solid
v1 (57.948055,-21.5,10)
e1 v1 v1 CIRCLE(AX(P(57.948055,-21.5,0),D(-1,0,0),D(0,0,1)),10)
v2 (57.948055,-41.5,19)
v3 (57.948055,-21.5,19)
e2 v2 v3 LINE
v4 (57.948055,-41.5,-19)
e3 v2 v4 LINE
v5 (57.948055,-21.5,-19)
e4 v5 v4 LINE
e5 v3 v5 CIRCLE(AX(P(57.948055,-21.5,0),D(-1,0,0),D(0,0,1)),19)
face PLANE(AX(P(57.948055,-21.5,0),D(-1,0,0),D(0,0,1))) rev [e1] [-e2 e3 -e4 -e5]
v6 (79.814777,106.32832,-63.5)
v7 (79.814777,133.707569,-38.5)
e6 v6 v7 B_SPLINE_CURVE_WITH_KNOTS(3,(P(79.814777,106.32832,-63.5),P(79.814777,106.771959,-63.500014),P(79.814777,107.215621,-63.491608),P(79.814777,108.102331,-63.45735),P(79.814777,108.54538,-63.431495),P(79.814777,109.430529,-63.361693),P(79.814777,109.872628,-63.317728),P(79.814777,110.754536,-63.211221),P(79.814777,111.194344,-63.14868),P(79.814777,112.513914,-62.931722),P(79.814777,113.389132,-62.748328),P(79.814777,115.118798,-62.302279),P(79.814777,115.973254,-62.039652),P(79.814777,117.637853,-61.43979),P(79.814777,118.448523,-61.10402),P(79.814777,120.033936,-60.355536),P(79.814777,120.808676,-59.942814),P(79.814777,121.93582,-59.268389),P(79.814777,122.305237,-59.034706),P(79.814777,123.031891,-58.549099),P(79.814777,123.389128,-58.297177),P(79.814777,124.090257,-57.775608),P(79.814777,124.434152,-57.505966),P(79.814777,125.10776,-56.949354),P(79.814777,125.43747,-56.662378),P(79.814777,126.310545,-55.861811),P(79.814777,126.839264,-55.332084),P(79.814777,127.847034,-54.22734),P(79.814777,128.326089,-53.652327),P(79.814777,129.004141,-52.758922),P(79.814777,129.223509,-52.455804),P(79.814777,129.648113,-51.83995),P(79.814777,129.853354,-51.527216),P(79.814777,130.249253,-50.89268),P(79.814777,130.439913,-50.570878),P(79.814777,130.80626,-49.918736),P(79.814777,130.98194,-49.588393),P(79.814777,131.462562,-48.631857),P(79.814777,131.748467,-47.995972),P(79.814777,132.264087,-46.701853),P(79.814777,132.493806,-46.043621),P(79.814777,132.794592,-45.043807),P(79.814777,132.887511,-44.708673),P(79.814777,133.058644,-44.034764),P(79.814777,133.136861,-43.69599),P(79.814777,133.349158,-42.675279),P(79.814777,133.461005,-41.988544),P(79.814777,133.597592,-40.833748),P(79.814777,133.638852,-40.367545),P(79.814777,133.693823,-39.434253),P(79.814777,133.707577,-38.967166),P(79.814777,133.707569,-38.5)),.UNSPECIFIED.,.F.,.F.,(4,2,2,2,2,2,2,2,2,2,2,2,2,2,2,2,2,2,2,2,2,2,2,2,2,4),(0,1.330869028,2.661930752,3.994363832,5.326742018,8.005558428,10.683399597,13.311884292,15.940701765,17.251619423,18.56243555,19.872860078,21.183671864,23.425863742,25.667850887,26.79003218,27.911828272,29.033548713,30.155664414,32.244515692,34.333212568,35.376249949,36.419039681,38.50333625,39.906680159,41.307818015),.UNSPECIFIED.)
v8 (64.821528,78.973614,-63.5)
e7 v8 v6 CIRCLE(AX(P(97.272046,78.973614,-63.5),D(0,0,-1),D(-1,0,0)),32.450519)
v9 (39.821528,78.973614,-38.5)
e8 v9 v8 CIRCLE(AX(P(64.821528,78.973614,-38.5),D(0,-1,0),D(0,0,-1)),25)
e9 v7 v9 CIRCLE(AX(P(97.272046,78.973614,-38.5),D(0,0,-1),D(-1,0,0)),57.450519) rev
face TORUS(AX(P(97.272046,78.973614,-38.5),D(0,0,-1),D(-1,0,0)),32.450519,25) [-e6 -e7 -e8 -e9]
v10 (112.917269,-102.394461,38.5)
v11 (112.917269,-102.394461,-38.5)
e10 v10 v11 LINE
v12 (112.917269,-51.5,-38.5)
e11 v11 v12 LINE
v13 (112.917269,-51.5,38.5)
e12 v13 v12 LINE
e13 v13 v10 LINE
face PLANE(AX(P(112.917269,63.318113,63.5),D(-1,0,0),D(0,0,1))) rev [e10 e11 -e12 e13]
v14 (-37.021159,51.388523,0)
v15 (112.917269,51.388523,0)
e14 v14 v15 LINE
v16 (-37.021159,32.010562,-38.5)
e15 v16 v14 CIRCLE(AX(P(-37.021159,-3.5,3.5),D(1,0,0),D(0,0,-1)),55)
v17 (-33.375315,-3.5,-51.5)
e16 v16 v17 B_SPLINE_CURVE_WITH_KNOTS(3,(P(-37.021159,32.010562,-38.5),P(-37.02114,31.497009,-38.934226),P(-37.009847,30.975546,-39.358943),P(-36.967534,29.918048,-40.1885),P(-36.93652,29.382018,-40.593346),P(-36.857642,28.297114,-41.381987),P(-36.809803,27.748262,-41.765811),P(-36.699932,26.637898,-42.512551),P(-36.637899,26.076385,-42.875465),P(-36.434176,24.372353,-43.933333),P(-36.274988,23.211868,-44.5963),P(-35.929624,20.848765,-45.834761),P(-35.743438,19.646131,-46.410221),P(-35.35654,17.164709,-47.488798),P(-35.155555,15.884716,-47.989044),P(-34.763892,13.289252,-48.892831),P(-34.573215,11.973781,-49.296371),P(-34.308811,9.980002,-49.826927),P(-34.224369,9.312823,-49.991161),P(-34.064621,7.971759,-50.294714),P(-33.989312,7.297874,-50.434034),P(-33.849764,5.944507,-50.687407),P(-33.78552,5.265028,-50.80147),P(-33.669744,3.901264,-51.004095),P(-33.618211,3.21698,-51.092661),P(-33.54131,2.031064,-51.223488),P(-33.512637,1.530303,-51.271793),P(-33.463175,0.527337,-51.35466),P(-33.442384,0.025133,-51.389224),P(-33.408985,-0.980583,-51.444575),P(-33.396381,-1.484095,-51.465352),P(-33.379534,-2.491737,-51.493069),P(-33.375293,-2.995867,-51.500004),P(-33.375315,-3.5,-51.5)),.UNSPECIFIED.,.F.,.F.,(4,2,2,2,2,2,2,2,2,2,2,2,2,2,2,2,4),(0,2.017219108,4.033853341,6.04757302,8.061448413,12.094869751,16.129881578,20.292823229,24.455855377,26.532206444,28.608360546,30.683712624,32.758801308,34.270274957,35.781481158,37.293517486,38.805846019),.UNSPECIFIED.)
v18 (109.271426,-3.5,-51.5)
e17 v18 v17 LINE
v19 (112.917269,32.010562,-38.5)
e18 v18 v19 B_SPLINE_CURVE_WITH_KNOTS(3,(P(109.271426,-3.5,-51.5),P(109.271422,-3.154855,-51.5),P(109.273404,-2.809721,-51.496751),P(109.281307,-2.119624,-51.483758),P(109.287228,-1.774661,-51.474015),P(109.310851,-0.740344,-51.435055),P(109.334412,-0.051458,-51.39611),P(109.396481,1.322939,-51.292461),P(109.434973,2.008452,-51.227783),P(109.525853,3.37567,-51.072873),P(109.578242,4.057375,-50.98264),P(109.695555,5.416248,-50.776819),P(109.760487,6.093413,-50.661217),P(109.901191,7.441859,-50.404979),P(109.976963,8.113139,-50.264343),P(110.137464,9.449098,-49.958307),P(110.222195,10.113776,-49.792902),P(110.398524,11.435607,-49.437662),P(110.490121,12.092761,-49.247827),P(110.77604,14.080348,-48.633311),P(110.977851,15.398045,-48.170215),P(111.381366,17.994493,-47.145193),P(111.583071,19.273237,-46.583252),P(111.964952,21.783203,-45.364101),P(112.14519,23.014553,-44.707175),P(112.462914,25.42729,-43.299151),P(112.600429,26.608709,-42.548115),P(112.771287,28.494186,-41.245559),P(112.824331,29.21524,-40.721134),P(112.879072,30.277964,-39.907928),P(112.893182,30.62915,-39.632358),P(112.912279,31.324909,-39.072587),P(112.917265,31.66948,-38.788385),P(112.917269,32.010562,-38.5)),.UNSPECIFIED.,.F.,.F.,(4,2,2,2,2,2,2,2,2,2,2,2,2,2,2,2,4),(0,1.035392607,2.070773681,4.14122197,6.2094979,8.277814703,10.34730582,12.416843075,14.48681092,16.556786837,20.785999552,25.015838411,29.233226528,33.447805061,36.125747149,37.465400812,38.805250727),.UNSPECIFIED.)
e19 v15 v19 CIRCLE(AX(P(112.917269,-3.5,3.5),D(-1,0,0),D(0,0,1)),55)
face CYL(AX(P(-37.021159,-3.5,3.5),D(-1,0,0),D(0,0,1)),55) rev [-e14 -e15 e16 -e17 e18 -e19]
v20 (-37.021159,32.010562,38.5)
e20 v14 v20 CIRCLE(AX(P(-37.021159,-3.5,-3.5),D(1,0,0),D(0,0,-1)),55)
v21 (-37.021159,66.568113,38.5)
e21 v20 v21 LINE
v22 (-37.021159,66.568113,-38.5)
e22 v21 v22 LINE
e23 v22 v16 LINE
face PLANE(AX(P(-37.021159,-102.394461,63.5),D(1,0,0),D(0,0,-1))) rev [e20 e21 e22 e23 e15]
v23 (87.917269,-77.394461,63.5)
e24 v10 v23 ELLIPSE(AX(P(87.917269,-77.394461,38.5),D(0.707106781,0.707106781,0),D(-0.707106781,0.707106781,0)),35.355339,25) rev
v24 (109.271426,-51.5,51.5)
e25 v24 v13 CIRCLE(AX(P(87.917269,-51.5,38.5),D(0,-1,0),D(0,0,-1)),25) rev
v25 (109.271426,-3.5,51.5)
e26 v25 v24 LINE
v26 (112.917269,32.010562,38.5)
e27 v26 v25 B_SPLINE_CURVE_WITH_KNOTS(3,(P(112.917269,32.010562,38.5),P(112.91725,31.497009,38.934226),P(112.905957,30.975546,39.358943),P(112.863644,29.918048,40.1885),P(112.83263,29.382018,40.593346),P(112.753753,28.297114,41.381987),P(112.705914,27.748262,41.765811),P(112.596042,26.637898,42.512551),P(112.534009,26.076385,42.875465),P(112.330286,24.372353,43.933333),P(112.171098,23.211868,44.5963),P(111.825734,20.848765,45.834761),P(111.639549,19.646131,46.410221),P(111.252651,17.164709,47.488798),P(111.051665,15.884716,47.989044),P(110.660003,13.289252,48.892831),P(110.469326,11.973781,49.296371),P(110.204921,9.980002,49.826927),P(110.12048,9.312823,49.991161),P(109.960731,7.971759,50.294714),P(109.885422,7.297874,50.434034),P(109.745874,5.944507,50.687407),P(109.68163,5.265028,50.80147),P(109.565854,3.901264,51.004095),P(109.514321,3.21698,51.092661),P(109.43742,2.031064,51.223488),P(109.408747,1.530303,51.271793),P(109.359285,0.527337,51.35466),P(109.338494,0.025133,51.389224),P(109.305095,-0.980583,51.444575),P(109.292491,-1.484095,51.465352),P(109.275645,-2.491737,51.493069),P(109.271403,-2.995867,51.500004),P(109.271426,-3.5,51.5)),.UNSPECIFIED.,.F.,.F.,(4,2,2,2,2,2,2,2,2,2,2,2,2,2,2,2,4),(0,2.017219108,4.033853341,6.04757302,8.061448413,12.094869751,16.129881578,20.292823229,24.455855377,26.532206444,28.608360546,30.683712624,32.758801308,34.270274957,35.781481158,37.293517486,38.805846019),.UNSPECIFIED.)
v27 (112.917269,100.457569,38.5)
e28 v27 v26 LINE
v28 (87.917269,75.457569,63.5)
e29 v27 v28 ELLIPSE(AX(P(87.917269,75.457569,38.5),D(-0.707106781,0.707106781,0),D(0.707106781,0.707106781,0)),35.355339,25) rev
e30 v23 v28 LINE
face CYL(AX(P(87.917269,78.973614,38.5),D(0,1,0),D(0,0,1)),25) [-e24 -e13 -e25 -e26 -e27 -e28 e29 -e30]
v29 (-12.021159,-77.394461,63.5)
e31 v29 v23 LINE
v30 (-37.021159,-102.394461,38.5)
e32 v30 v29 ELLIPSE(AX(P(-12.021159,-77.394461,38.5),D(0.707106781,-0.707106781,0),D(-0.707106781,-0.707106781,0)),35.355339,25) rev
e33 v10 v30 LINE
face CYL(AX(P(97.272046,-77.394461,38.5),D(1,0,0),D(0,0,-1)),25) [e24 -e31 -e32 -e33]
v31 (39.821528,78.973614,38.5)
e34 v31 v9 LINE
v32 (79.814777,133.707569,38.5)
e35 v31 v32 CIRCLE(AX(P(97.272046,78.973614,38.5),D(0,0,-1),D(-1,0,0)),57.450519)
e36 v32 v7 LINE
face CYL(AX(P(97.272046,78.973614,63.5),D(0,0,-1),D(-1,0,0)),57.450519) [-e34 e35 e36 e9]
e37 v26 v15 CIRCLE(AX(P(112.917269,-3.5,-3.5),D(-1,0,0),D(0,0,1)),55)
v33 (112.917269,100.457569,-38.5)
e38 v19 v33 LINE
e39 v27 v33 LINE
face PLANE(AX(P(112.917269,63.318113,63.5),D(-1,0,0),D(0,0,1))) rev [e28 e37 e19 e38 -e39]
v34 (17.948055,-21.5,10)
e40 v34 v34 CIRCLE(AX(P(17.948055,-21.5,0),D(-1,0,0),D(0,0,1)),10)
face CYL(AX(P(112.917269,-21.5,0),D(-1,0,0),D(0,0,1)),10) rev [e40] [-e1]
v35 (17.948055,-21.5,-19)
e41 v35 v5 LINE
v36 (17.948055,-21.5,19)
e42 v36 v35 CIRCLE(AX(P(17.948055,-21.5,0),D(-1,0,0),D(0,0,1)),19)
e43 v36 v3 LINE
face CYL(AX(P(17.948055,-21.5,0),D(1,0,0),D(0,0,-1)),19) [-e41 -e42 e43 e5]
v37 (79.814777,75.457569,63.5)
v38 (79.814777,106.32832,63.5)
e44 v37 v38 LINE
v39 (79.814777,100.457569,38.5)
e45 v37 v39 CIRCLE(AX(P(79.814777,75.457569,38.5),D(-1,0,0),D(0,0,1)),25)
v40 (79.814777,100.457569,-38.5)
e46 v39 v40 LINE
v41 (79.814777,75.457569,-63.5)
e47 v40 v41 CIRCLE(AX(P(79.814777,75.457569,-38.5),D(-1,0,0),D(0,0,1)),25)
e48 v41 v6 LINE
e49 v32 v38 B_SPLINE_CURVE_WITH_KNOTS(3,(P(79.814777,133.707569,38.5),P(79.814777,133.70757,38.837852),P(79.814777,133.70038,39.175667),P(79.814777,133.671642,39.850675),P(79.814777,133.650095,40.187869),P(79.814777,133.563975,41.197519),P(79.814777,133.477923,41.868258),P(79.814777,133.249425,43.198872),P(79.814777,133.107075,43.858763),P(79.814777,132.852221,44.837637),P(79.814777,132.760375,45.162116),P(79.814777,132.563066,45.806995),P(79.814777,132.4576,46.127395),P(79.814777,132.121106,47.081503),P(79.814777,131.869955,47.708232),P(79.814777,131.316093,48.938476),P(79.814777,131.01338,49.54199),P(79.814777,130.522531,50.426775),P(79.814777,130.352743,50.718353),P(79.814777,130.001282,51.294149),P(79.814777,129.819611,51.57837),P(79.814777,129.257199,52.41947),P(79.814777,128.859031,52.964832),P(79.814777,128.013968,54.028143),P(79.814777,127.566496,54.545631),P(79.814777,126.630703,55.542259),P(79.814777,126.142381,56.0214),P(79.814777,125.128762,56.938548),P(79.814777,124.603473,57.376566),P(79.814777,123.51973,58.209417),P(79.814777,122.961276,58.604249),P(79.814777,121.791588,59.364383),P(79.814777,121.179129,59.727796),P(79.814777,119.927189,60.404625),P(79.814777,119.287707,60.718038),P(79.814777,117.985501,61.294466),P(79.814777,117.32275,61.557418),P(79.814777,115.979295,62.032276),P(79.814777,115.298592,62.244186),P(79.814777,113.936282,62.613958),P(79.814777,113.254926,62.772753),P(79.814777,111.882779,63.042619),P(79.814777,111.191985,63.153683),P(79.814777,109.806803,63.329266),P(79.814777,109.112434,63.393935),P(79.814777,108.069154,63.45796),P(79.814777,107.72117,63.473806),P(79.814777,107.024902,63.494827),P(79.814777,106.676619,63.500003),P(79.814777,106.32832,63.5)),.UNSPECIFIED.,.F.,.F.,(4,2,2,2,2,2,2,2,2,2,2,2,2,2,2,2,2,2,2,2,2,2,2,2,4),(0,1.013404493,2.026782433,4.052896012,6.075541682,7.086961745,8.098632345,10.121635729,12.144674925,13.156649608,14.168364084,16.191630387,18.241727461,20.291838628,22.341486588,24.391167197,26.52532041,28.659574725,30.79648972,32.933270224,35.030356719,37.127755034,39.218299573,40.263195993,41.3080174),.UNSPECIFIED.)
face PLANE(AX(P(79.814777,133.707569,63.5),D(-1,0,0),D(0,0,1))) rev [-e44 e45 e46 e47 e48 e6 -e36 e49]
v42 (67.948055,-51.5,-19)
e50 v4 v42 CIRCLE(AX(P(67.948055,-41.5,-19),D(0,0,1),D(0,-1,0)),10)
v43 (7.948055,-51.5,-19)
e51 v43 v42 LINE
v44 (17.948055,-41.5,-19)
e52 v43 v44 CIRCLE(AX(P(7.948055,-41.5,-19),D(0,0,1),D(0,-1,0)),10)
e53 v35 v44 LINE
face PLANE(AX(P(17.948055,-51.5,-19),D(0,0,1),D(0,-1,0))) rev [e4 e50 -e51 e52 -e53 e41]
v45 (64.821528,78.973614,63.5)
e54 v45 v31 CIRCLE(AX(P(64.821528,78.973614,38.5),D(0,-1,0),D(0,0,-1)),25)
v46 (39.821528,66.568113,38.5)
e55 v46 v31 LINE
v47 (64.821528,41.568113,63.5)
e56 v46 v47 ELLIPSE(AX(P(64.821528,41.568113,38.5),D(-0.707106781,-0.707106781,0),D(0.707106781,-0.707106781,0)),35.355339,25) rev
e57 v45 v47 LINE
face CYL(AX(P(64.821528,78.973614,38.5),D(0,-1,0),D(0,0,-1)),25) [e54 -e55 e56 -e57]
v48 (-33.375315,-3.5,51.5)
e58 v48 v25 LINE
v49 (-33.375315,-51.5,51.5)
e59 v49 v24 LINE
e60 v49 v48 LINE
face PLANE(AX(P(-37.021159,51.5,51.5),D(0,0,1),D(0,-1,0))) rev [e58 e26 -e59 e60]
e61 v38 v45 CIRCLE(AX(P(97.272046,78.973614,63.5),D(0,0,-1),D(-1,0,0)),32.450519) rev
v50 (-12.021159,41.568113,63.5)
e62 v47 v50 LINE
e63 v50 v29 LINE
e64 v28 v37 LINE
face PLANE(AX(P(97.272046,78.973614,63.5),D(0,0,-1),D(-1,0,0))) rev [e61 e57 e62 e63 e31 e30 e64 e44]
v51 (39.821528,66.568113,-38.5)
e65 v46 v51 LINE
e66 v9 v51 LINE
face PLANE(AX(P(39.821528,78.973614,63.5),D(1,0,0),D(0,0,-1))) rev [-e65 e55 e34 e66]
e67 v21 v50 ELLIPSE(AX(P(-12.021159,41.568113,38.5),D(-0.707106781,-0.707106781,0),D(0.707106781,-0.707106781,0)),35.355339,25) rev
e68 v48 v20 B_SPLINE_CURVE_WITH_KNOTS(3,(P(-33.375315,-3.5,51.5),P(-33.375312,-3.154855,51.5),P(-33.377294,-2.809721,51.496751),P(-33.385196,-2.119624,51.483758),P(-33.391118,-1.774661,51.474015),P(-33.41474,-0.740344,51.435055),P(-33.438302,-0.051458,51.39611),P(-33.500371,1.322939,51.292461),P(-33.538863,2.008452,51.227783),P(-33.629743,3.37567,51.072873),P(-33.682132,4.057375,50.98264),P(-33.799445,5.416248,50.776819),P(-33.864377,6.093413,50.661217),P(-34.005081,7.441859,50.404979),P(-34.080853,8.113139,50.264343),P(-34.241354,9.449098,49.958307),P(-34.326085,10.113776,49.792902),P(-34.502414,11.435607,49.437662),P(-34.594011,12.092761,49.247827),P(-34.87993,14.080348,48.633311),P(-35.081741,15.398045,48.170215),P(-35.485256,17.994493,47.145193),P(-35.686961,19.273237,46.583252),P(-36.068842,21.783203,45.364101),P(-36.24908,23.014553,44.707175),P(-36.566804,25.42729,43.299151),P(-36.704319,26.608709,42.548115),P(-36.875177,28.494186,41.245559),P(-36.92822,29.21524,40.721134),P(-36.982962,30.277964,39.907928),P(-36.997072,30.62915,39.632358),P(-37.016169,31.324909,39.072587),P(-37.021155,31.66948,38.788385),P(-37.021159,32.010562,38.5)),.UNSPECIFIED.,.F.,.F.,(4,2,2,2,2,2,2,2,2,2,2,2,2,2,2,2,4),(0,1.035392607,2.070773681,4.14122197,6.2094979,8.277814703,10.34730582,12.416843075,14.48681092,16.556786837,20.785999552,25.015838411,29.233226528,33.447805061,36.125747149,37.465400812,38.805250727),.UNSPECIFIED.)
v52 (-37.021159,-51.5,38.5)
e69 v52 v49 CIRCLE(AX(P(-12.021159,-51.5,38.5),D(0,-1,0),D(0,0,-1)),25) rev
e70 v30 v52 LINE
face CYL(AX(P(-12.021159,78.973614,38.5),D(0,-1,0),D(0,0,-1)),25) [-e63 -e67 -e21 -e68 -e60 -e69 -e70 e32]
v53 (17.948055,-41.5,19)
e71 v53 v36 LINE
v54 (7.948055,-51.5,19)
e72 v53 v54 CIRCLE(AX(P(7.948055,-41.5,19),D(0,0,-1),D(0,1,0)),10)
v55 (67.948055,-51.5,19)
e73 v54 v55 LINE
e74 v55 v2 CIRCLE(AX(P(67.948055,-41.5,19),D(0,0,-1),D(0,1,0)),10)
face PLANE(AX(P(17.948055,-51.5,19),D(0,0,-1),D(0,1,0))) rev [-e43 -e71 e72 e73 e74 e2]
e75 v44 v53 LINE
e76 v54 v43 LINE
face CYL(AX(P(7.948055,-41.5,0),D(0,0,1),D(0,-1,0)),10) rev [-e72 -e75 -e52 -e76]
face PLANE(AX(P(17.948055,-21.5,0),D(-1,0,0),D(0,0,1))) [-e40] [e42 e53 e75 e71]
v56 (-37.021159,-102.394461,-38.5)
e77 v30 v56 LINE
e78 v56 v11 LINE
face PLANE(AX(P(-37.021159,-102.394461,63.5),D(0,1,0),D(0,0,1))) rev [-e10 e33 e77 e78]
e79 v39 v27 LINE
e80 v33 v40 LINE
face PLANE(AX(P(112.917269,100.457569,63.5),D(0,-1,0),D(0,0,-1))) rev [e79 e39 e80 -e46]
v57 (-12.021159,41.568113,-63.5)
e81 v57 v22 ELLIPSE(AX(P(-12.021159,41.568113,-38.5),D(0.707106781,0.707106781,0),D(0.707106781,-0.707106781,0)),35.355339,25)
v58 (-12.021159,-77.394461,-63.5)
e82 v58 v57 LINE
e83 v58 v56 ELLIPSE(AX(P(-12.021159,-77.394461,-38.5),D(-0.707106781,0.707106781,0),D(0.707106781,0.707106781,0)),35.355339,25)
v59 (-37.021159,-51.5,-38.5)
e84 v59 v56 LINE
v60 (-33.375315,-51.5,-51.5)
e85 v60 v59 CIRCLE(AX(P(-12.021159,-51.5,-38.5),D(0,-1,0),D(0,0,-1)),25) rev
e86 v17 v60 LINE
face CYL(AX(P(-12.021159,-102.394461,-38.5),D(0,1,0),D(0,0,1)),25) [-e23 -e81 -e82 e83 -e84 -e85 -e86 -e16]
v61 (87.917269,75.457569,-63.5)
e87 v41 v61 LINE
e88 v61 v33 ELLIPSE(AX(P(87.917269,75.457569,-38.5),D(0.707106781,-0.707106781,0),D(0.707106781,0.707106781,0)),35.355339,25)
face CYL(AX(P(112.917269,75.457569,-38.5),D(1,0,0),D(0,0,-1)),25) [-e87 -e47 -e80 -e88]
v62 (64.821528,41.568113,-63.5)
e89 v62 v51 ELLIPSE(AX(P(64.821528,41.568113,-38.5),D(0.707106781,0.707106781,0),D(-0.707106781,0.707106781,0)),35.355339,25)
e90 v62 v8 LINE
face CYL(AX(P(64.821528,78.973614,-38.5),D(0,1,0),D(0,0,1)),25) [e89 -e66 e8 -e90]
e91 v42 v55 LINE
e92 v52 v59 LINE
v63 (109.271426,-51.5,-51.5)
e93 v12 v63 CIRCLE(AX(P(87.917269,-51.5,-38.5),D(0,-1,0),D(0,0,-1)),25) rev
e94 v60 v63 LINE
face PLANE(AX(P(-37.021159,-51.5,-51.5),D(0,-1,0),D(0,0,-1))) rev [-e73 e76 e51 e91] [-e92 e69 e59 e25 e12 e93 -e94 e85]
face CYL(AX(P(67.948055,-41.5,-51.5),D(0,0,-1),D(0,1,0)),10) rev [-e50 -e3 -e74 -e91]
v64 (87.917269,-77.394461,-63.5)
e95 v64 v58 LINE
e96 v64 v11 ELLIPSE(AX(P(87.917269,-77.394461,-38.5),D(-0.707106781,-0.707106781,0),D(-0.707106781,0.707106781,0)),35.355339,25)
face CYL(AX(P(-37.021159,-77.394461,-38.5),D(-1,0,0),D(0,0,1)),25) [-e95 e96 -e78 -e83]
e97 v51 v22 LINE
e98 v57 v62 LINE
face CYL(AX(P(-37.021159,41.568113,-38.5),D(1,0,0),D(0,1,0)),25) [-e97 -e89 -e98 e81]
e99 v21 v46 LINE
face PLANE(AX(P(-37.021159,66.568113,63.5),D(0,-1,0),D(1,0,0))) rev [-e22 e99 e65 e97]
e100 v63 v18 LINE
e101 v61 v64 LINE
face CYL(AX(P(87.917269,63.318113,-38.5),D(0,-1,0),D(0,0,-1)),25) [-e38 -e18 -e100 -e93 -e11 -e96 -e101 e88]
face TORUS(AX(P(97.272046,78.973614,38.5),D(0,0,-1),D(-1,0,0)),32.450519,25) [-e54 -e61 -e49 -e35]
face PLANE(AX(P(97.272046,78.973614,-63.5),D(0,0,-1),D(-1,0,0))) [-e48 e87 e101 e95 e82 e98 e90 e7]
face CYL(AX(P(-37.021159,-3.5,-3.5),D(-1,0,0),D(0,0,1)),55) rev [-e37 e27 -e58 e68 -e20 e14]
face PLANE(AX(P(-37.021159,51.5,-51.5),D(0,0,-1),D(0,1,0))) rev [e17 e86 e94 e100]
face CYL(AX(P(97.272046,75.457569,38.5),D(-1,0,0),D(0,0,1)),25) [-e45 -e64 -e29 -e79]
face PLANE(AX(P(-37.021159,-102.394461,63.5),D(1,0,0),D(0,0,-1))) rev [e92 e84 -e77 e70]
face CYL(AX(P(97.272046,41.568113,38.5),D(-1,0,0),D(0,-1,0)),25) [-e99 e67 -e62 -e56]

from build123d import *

# Parameters (mm, degrees)
BOSS_EXTRUDE1_DEPTH = 63.5
SKETCH3_W           = 103
SKETCH3_H           = 103
CUT_EXTRUDE1_DEPTH  = 211.692895559
BOSS_EXTRUDE2_DEPTH = 20
FILLET1_R           = 55
SKETCH6_R           = 10
CUT_EXTRUDE2_DEPTH  = 176.866755526
FILLET2_R           = 10
FILLET3_R           = 25


with BuildPart() as part:
    # Sketch2 → Boss-Extrude1 (new, symmetric)
    with BuildSketch(Plane.XY):
        with BuildLine():
            Line((-37.021158778, -102.394460884), (112.91726901, -102.394460884))
            Line((112.91726901, -102.394460884), (112.91726901, 63.318112544))
            Line((112.91726901, 63.318112544), (112.91726901, 100.457569387))
            Line((112.91726901, 100.457569387), (79.814777063, 100.457569387))
            Line((79.814777063, 100.457569387), (79.814777063, 133.707569387))
            ThreePointArc((79.814777063, 133.707569387), (50.885133933, 112.867809308), (39.821527553, 78.973614146))
            Line((39.821527553, 78.973614146), (39.821527553, 66.568112544))
            Line((39.821527553, 66.568112544), (-37.021158778, 66.568112544))
            Line((-37.021158778, 66.568112544), (-37.021158778, -102.394460884))
        make_face()
    extrude(amount=BOSS_EXTRUDE1_DEPTH, both=True)

    # Sketch3 → Cut-Extrude1 (cut, through all)
    with BuildSketch(Plane(origin=(112.91726901, 0, 0), x_dir=(0, 0, -1), z_dir=(1, 0, 0))):
        Rectangle(SKETCH3_W, SKETCH3_H)
    extrude(amount=-CUT_EXTRUDE1_DEPTH, mode=Mode.SUBTRACT)

    # Sketch5 → Boss-Extrude2 (add, symmetric)
    with BuildSketch(Plane.ZY.offset(-37.948055116)):
        with BuildLine():
            Line((19, -51.5), (-19, -51.5))
            Line((-19, -51.5), (-19, -21.5))
            ThreePointArc((-19, -21.5), (0, -2.5), (19, -21.5))
            Line((19, -21.5), (19, -51.5))
        make_face()
    extrude(amount=BOSS_EXTRUDE2_DEPTH, both=True)

    # Fillet1
    # the kernel refuses this fillet: 55 mm, written as the material it adds along each edge
    with BuildSketch(Plane(origin=(112.91726901, 51.5, 51.5), x_dir=(0, 0, -1), z_dir=(-1, 0, 0))) as fillet1_piece_1:
        with BuildLine():
            CenterArc((FILLET1_R, FILLET1_R), FILLET1_R, 180, 90)
            Line((0, FILLET1_R), (0, 0))
            Line((0, 0), (FILLET1_R, 0))
        make_face()
    extrude(amount=149.938427788)
    with BuildSketch(Plane(origin=(112.91726901, 51.5, -51.5), x_dir=(0, 0, 1), z_dir=(-1, 0, 0))) as fillet1_piece_2:
        with BuildLine():
            CenterArc((FILLET1_R, -FILLET1_R), FILLET1_R, 90, 90)
            Line((0, -FILLET1_R), (0, 0))
            Line((0, 0), (FILLET1_R, 0))
        make_face()
    extrude(amount=149.938427788)

    # Sketch6 → Cut-Extrude2 (cut, through all)
    with BuildSketch(Plane.ZY.offset(-17.948055116)):
        with Locations((0, -21.5)):
            Circle(SKETCH6_R)
    extrude(amount=-CUT_EXTRUDE2_DEPTH, mode=Mode.SUBTRACT)

    # Fillet2
    fillet2_edges = [part.edges().sort_by_distance(p)[0] for p in [
        (57.948055116, -51.5, 0),
        (17.948055116, -51.5, 0),
    ]]
    fillet(fillet2_edges, radius=FILLET2_R)

    # Fillet3
    # the kernel refuses this fillet: 25 mm, written as the material it takes off along each edge
    with BuildSketch(Plane(origin=(39.821527553, 78.973614146, -63.5), x_dir=(0, 0, 1), z_dir=(0, -1, 0)), Plane(origin=(39.821527553, 78.973614146, 63.5), x_dir=(1, 0, 0), z_dir=(0, -1, 0))) as fillet3_piece_1:
        with BuildLine():
            CenterArc((FILLET3_R, -FILLET3_R), FILLET3_R, 90, 90)
            Line((0, -FILLET3_R), (0, 0))
            Line((0, 0), (FILLET3_R, 0))
        make_face()
    extrude(amount=12.405501602, mode=Mode.SUBTRACT)
    with BuildSketch(Plane(origin=(97.272046317, 78.973614146, -63.5), x_dir=(0.7028717188946543, 0.711316629060557, 0), z_dir=(0.711316629060557, -0.7028717188946543, 0))) as fillet3_piece_2:
        with BuildLine():
            CenterArc((57.450518764 - FILLET3_R, FILLET3_R), FILLET3_R, 270, 90)
            Line((57.450518764 - FILLET3_R, 0), (57.450518764, 0))
            Line((57.450518764, 0), (57.450518764, FILLET3_R))
        make_face()
    revolve(axis=Axis((97.272046317, 78.973614146, -63.5), (0, 0, 1)), revolution_arc=134.657858898, mode=Mode.SUBTRACT)
    with BuildSketch(Plane(origin=(-99.521158778, -102.394460884, 63.5), x_dir=(0, 0, -1), z_dir=(1, 0, 0))) as fillet3_piece_3:
        with BuildLine():
            CenterArc((FILLET3_R, FILLET3_R), FILLET3_R, 180, 90)
            Line((0, FILLET3_R), (0, 0))
            Line((0, 0), (FILLET3_R, 0))
        make_face()
    extrude(amount=274.938427788, mode=Mode.SUBTRACT)
    with BuildSketch(Plane(origin=(97.272046317, 78.973614146, 63.5), x_dir=(0.7028717188946543, 0.711316629060557, 0), z_dir=(0.711316629060557, -0.7028717188946543, 0))) as fillet3_piece_4:
        with BuildLine():
            CenterArc((57.450518764 - FILLET3_R, -FILLET3_R), FILLET3_R, 0, 90)
            Line((57.450518764, -FILLET3_R), (57.450518764, 0))
            Line((57.450518764, 0), (57.450518764 - FILLET3_R, 0))
        make_face()
    revolve(axis=Axis((97.272046317, 78.973614146, 63.5), (0, 0, 1)), revolution_arc=134.657858898, mode=Mode.SUBTRACT)
    with BuildSketch(Plane(origin=(39.821527553, 66.568112544, 63.5), x_dir=(0, -1, 0), z_dir=(-1, 0, 0)), Plane(origin=(39.821527553, 66.568112544, -63.5), x_dir=(0, 0, 1), z_dir=(-1, 0, 0))) as fillet3_piece_5:
        with BuildLine():
            CenterArc((FILLET3_R, -FILLET3_R), FILLET3_R, 90, 90)
            Line((0, -FILLET3_R), (0, 0))
            Line((0, 0), (FILLET3_R, 0))
        make_face()
    extrude(amount=139.342686331, mode=Mode.SUBTRACT)
    with BuildSketch(Plane(origin=(-37.021158778, 129.068112544, 63.5), x_dir=(0, 0, -1), z_dir=(0, -1, 0))) as fillet3_piece_6:
        with BuildLine():
            CenterArc((FILLET3_R, FILLET3_R), FILLET3_R, 180, 90)
            Line((0, FILLET3_R), (0, 0))
            Line((0, 0), (FILLET3_R, 0))
        make_face()
    extrude(amount=293.962573428, mode=Mode.SUBTRACT)
    with BuildSketch(Plane(origin=(112.91726901, 162.957569387, 63.5), x_dir=(-1, 0, 0), z_dir=(0, -1, 0)), Plane(origin=(112.91726901, -164.894460884, -63.5), x_dir=(-1, 0, 0), z_dir=(0, 1, 0))) as fillet3_piece_7:
        with BuildLine():
            CenterArc((FILLET3_R, FILLET3_R), FILLET3_R, 180, 90)
            Line((0, FILLET3_R), (0, 0))
            Line((0, 0), (FILLET3_R, 0))
        make_face()
    extrude(amount=327.852030272, mode=Mode.SUBTRACT)
    with BuildSketch(Plane(origin=(-99.521158778, -102.394460884, -63.5), x_dir=(0, 0, 1), z_dir=(1, 0, 0))) as fillet3_piece_8:
        with BuildLine():
            CenterArc((FILLET3_R, -FILLET3_R), FILLET3_R, 90, 90)
            Line((0, -FILLET3_R), (0, 0))
            Line((0, 0), (FILLET3_R, 0))
        make_face()
    extrude(amount=274.938427788, mode=Mode.SUBTRACT)
    with BuildSketch(Plane(origin=(-37.021158778, 129.068112544, -63.5), x_dir=(0, 0, 1), z_dir=(0, -1, 0))) as fillet3_piece_9:
        with BuildLine():
            CenterArc((FILLET3_R, -FILLET3_R), FILLET3_R, 90, 90)
            Line((0, -FILLET3_R), (0, 0))
            Line((0, 0), (FILLET3_R, 0))
        make_face()
    extrude(amount=293.962573428, mode=Mode.SUBTRACT)
    with BuildSketch(Plane(origin=(175.41726901, 100.457569387, -63.5), x_dir=(0, 0, 1), z_dir=(-1, 0, 0)), Plane(origin=(175.41726901, 100.457569387, 63.5), x_dir=(0, -1, 0), z_dir=(-1, 0, 0))) as fillet3_piece_10:
        with BuildLine():
            CenterArc((FILLET3_R, -FILLET3_R), FILLET3_R, 90, 90)
            Line((0, -FILLET3_R), (0, 0))
            Line((0, 0), (FILLET3_R, 0))
        make_face()
    extrude(amount=95.602491947, mode=Mode.SUBTRACT)
    with BuildSketch(Plane(origin=(39.821527553, 78.973614146, -63.5), x_dir=(0, 0, 1), z_dir=(0, -1, 0))) as fillet3_piece_11a_section:
        with BuildLine():
            CenterArc((FILLET3_R, -FILLET3_R), FILLET3_R, 90, 90)
            Line((0, -FILLET3_R), (0, 0))
            Line((0, 0), (FILLET3_R, 0))
        make_face()
    fillet3_piece_11a = extrude(amount=74.905501602, mode=Mode.PRIVATE)
    fillet3_piece_11a = split(fillet3_piece_11a, bisect_by=Plane(origin=(45.48140541, 66.568112544, -57.840122143), z_dir=(0, -1, 0)), keep=Keep.TOP, mode=Mode.PRIVATE)
    with BuildSketch(Plane(origin=(102.321527553, 66.568112544, -63.5), x_dir=(0, 0, 1), z_dir=(-1, 0, 0))) as fillet3_piece_11b_section:
        with BuildLine():
            CenterArc((FILLET3_R, -FILLET3_R), FILLET3_R, 90, 90)
            Line((0, -FILLET3_R), (0, 0))
            Line((0, 0), (FILLET3_R, 0))
        make_face()
    fillet3_piece_11b = extrude(amount=201.842686331, mode=Mode.PRIVATE)
    fillet3_piece_11b = split(fillet3_piece_11b, bisect_by=Plane(origin=(39.821527553, 60.908234687, -57.840122143), z_dir=(1, 0, 0)), keep=Keep.TOP, mode=Mode.PRIVATE)
    fillet3_piece_11 = fillet3_piece_11a & fillet3_piece_11b
    add(fillet3_piece_11, mode=Mode.SUBTRACT)
    with BuildSketch(Plane(origin=(39.821527553, 78.973614146, 63.5), x_dir=(1, 0, 0), z_dir=(0, -1, 0))) as fillet3_piece_12a_section:
        with BuildLine():
            CenterArc((FILLET3_R, -FILLET3_R), FILLET3_R, 90, 90)
            Line((0, -FILLET3_R), (0, 0))
            Line((0, 0), (FILLET3_R, 0))
        make_face()
    fillet3_piece_12a = extrude(amount=74.905501602, mode=Mode.PRIVATE)
    fillet3_piece_12a = split(fillet3_piece_12a, bisect_by=Plane(origin=(45.48140541, 66.568112544, 57.840122143), z_dir=(0, -1, 0)), keep=Keep.TOP, mode=Mode.PRIVATE)
    with BuildSketch(Plane(origin=(102.321527553, 66.568112544, 63.5), x_dir=(0, -1, 0), z_dir=(-1, 0, 0))) as fillet3_piece_12b_section:
        with BuildLine():
            CenterArc((FILLET3_R, -FILLET3_R), FILLET3_R, 90, 90)
            Line((0, -FILLET3_R), (0, 0))
            Line((0, 0), (FILLET3_R, 0))
        make_face()
    fillet3_piece_12b = extrude(amount=201.842686331, mode=Mode.PRIVATE)
    fillet3_piece_12b = split(fillet3_piece_12b, bisect_by=Plane(origin=(39.821527553, 60.908234687, 57.840122143), z_dir=(1, 0, 0)), keep=Keep.TOP, mode=Mode.PRIVATE)
    fillet3_piece_12 = fillet3_piece_12a & fillet3_piece_12b
    add(fillet3_piece_12, mode=Mode.SUBTRACT)


solid = part.part
